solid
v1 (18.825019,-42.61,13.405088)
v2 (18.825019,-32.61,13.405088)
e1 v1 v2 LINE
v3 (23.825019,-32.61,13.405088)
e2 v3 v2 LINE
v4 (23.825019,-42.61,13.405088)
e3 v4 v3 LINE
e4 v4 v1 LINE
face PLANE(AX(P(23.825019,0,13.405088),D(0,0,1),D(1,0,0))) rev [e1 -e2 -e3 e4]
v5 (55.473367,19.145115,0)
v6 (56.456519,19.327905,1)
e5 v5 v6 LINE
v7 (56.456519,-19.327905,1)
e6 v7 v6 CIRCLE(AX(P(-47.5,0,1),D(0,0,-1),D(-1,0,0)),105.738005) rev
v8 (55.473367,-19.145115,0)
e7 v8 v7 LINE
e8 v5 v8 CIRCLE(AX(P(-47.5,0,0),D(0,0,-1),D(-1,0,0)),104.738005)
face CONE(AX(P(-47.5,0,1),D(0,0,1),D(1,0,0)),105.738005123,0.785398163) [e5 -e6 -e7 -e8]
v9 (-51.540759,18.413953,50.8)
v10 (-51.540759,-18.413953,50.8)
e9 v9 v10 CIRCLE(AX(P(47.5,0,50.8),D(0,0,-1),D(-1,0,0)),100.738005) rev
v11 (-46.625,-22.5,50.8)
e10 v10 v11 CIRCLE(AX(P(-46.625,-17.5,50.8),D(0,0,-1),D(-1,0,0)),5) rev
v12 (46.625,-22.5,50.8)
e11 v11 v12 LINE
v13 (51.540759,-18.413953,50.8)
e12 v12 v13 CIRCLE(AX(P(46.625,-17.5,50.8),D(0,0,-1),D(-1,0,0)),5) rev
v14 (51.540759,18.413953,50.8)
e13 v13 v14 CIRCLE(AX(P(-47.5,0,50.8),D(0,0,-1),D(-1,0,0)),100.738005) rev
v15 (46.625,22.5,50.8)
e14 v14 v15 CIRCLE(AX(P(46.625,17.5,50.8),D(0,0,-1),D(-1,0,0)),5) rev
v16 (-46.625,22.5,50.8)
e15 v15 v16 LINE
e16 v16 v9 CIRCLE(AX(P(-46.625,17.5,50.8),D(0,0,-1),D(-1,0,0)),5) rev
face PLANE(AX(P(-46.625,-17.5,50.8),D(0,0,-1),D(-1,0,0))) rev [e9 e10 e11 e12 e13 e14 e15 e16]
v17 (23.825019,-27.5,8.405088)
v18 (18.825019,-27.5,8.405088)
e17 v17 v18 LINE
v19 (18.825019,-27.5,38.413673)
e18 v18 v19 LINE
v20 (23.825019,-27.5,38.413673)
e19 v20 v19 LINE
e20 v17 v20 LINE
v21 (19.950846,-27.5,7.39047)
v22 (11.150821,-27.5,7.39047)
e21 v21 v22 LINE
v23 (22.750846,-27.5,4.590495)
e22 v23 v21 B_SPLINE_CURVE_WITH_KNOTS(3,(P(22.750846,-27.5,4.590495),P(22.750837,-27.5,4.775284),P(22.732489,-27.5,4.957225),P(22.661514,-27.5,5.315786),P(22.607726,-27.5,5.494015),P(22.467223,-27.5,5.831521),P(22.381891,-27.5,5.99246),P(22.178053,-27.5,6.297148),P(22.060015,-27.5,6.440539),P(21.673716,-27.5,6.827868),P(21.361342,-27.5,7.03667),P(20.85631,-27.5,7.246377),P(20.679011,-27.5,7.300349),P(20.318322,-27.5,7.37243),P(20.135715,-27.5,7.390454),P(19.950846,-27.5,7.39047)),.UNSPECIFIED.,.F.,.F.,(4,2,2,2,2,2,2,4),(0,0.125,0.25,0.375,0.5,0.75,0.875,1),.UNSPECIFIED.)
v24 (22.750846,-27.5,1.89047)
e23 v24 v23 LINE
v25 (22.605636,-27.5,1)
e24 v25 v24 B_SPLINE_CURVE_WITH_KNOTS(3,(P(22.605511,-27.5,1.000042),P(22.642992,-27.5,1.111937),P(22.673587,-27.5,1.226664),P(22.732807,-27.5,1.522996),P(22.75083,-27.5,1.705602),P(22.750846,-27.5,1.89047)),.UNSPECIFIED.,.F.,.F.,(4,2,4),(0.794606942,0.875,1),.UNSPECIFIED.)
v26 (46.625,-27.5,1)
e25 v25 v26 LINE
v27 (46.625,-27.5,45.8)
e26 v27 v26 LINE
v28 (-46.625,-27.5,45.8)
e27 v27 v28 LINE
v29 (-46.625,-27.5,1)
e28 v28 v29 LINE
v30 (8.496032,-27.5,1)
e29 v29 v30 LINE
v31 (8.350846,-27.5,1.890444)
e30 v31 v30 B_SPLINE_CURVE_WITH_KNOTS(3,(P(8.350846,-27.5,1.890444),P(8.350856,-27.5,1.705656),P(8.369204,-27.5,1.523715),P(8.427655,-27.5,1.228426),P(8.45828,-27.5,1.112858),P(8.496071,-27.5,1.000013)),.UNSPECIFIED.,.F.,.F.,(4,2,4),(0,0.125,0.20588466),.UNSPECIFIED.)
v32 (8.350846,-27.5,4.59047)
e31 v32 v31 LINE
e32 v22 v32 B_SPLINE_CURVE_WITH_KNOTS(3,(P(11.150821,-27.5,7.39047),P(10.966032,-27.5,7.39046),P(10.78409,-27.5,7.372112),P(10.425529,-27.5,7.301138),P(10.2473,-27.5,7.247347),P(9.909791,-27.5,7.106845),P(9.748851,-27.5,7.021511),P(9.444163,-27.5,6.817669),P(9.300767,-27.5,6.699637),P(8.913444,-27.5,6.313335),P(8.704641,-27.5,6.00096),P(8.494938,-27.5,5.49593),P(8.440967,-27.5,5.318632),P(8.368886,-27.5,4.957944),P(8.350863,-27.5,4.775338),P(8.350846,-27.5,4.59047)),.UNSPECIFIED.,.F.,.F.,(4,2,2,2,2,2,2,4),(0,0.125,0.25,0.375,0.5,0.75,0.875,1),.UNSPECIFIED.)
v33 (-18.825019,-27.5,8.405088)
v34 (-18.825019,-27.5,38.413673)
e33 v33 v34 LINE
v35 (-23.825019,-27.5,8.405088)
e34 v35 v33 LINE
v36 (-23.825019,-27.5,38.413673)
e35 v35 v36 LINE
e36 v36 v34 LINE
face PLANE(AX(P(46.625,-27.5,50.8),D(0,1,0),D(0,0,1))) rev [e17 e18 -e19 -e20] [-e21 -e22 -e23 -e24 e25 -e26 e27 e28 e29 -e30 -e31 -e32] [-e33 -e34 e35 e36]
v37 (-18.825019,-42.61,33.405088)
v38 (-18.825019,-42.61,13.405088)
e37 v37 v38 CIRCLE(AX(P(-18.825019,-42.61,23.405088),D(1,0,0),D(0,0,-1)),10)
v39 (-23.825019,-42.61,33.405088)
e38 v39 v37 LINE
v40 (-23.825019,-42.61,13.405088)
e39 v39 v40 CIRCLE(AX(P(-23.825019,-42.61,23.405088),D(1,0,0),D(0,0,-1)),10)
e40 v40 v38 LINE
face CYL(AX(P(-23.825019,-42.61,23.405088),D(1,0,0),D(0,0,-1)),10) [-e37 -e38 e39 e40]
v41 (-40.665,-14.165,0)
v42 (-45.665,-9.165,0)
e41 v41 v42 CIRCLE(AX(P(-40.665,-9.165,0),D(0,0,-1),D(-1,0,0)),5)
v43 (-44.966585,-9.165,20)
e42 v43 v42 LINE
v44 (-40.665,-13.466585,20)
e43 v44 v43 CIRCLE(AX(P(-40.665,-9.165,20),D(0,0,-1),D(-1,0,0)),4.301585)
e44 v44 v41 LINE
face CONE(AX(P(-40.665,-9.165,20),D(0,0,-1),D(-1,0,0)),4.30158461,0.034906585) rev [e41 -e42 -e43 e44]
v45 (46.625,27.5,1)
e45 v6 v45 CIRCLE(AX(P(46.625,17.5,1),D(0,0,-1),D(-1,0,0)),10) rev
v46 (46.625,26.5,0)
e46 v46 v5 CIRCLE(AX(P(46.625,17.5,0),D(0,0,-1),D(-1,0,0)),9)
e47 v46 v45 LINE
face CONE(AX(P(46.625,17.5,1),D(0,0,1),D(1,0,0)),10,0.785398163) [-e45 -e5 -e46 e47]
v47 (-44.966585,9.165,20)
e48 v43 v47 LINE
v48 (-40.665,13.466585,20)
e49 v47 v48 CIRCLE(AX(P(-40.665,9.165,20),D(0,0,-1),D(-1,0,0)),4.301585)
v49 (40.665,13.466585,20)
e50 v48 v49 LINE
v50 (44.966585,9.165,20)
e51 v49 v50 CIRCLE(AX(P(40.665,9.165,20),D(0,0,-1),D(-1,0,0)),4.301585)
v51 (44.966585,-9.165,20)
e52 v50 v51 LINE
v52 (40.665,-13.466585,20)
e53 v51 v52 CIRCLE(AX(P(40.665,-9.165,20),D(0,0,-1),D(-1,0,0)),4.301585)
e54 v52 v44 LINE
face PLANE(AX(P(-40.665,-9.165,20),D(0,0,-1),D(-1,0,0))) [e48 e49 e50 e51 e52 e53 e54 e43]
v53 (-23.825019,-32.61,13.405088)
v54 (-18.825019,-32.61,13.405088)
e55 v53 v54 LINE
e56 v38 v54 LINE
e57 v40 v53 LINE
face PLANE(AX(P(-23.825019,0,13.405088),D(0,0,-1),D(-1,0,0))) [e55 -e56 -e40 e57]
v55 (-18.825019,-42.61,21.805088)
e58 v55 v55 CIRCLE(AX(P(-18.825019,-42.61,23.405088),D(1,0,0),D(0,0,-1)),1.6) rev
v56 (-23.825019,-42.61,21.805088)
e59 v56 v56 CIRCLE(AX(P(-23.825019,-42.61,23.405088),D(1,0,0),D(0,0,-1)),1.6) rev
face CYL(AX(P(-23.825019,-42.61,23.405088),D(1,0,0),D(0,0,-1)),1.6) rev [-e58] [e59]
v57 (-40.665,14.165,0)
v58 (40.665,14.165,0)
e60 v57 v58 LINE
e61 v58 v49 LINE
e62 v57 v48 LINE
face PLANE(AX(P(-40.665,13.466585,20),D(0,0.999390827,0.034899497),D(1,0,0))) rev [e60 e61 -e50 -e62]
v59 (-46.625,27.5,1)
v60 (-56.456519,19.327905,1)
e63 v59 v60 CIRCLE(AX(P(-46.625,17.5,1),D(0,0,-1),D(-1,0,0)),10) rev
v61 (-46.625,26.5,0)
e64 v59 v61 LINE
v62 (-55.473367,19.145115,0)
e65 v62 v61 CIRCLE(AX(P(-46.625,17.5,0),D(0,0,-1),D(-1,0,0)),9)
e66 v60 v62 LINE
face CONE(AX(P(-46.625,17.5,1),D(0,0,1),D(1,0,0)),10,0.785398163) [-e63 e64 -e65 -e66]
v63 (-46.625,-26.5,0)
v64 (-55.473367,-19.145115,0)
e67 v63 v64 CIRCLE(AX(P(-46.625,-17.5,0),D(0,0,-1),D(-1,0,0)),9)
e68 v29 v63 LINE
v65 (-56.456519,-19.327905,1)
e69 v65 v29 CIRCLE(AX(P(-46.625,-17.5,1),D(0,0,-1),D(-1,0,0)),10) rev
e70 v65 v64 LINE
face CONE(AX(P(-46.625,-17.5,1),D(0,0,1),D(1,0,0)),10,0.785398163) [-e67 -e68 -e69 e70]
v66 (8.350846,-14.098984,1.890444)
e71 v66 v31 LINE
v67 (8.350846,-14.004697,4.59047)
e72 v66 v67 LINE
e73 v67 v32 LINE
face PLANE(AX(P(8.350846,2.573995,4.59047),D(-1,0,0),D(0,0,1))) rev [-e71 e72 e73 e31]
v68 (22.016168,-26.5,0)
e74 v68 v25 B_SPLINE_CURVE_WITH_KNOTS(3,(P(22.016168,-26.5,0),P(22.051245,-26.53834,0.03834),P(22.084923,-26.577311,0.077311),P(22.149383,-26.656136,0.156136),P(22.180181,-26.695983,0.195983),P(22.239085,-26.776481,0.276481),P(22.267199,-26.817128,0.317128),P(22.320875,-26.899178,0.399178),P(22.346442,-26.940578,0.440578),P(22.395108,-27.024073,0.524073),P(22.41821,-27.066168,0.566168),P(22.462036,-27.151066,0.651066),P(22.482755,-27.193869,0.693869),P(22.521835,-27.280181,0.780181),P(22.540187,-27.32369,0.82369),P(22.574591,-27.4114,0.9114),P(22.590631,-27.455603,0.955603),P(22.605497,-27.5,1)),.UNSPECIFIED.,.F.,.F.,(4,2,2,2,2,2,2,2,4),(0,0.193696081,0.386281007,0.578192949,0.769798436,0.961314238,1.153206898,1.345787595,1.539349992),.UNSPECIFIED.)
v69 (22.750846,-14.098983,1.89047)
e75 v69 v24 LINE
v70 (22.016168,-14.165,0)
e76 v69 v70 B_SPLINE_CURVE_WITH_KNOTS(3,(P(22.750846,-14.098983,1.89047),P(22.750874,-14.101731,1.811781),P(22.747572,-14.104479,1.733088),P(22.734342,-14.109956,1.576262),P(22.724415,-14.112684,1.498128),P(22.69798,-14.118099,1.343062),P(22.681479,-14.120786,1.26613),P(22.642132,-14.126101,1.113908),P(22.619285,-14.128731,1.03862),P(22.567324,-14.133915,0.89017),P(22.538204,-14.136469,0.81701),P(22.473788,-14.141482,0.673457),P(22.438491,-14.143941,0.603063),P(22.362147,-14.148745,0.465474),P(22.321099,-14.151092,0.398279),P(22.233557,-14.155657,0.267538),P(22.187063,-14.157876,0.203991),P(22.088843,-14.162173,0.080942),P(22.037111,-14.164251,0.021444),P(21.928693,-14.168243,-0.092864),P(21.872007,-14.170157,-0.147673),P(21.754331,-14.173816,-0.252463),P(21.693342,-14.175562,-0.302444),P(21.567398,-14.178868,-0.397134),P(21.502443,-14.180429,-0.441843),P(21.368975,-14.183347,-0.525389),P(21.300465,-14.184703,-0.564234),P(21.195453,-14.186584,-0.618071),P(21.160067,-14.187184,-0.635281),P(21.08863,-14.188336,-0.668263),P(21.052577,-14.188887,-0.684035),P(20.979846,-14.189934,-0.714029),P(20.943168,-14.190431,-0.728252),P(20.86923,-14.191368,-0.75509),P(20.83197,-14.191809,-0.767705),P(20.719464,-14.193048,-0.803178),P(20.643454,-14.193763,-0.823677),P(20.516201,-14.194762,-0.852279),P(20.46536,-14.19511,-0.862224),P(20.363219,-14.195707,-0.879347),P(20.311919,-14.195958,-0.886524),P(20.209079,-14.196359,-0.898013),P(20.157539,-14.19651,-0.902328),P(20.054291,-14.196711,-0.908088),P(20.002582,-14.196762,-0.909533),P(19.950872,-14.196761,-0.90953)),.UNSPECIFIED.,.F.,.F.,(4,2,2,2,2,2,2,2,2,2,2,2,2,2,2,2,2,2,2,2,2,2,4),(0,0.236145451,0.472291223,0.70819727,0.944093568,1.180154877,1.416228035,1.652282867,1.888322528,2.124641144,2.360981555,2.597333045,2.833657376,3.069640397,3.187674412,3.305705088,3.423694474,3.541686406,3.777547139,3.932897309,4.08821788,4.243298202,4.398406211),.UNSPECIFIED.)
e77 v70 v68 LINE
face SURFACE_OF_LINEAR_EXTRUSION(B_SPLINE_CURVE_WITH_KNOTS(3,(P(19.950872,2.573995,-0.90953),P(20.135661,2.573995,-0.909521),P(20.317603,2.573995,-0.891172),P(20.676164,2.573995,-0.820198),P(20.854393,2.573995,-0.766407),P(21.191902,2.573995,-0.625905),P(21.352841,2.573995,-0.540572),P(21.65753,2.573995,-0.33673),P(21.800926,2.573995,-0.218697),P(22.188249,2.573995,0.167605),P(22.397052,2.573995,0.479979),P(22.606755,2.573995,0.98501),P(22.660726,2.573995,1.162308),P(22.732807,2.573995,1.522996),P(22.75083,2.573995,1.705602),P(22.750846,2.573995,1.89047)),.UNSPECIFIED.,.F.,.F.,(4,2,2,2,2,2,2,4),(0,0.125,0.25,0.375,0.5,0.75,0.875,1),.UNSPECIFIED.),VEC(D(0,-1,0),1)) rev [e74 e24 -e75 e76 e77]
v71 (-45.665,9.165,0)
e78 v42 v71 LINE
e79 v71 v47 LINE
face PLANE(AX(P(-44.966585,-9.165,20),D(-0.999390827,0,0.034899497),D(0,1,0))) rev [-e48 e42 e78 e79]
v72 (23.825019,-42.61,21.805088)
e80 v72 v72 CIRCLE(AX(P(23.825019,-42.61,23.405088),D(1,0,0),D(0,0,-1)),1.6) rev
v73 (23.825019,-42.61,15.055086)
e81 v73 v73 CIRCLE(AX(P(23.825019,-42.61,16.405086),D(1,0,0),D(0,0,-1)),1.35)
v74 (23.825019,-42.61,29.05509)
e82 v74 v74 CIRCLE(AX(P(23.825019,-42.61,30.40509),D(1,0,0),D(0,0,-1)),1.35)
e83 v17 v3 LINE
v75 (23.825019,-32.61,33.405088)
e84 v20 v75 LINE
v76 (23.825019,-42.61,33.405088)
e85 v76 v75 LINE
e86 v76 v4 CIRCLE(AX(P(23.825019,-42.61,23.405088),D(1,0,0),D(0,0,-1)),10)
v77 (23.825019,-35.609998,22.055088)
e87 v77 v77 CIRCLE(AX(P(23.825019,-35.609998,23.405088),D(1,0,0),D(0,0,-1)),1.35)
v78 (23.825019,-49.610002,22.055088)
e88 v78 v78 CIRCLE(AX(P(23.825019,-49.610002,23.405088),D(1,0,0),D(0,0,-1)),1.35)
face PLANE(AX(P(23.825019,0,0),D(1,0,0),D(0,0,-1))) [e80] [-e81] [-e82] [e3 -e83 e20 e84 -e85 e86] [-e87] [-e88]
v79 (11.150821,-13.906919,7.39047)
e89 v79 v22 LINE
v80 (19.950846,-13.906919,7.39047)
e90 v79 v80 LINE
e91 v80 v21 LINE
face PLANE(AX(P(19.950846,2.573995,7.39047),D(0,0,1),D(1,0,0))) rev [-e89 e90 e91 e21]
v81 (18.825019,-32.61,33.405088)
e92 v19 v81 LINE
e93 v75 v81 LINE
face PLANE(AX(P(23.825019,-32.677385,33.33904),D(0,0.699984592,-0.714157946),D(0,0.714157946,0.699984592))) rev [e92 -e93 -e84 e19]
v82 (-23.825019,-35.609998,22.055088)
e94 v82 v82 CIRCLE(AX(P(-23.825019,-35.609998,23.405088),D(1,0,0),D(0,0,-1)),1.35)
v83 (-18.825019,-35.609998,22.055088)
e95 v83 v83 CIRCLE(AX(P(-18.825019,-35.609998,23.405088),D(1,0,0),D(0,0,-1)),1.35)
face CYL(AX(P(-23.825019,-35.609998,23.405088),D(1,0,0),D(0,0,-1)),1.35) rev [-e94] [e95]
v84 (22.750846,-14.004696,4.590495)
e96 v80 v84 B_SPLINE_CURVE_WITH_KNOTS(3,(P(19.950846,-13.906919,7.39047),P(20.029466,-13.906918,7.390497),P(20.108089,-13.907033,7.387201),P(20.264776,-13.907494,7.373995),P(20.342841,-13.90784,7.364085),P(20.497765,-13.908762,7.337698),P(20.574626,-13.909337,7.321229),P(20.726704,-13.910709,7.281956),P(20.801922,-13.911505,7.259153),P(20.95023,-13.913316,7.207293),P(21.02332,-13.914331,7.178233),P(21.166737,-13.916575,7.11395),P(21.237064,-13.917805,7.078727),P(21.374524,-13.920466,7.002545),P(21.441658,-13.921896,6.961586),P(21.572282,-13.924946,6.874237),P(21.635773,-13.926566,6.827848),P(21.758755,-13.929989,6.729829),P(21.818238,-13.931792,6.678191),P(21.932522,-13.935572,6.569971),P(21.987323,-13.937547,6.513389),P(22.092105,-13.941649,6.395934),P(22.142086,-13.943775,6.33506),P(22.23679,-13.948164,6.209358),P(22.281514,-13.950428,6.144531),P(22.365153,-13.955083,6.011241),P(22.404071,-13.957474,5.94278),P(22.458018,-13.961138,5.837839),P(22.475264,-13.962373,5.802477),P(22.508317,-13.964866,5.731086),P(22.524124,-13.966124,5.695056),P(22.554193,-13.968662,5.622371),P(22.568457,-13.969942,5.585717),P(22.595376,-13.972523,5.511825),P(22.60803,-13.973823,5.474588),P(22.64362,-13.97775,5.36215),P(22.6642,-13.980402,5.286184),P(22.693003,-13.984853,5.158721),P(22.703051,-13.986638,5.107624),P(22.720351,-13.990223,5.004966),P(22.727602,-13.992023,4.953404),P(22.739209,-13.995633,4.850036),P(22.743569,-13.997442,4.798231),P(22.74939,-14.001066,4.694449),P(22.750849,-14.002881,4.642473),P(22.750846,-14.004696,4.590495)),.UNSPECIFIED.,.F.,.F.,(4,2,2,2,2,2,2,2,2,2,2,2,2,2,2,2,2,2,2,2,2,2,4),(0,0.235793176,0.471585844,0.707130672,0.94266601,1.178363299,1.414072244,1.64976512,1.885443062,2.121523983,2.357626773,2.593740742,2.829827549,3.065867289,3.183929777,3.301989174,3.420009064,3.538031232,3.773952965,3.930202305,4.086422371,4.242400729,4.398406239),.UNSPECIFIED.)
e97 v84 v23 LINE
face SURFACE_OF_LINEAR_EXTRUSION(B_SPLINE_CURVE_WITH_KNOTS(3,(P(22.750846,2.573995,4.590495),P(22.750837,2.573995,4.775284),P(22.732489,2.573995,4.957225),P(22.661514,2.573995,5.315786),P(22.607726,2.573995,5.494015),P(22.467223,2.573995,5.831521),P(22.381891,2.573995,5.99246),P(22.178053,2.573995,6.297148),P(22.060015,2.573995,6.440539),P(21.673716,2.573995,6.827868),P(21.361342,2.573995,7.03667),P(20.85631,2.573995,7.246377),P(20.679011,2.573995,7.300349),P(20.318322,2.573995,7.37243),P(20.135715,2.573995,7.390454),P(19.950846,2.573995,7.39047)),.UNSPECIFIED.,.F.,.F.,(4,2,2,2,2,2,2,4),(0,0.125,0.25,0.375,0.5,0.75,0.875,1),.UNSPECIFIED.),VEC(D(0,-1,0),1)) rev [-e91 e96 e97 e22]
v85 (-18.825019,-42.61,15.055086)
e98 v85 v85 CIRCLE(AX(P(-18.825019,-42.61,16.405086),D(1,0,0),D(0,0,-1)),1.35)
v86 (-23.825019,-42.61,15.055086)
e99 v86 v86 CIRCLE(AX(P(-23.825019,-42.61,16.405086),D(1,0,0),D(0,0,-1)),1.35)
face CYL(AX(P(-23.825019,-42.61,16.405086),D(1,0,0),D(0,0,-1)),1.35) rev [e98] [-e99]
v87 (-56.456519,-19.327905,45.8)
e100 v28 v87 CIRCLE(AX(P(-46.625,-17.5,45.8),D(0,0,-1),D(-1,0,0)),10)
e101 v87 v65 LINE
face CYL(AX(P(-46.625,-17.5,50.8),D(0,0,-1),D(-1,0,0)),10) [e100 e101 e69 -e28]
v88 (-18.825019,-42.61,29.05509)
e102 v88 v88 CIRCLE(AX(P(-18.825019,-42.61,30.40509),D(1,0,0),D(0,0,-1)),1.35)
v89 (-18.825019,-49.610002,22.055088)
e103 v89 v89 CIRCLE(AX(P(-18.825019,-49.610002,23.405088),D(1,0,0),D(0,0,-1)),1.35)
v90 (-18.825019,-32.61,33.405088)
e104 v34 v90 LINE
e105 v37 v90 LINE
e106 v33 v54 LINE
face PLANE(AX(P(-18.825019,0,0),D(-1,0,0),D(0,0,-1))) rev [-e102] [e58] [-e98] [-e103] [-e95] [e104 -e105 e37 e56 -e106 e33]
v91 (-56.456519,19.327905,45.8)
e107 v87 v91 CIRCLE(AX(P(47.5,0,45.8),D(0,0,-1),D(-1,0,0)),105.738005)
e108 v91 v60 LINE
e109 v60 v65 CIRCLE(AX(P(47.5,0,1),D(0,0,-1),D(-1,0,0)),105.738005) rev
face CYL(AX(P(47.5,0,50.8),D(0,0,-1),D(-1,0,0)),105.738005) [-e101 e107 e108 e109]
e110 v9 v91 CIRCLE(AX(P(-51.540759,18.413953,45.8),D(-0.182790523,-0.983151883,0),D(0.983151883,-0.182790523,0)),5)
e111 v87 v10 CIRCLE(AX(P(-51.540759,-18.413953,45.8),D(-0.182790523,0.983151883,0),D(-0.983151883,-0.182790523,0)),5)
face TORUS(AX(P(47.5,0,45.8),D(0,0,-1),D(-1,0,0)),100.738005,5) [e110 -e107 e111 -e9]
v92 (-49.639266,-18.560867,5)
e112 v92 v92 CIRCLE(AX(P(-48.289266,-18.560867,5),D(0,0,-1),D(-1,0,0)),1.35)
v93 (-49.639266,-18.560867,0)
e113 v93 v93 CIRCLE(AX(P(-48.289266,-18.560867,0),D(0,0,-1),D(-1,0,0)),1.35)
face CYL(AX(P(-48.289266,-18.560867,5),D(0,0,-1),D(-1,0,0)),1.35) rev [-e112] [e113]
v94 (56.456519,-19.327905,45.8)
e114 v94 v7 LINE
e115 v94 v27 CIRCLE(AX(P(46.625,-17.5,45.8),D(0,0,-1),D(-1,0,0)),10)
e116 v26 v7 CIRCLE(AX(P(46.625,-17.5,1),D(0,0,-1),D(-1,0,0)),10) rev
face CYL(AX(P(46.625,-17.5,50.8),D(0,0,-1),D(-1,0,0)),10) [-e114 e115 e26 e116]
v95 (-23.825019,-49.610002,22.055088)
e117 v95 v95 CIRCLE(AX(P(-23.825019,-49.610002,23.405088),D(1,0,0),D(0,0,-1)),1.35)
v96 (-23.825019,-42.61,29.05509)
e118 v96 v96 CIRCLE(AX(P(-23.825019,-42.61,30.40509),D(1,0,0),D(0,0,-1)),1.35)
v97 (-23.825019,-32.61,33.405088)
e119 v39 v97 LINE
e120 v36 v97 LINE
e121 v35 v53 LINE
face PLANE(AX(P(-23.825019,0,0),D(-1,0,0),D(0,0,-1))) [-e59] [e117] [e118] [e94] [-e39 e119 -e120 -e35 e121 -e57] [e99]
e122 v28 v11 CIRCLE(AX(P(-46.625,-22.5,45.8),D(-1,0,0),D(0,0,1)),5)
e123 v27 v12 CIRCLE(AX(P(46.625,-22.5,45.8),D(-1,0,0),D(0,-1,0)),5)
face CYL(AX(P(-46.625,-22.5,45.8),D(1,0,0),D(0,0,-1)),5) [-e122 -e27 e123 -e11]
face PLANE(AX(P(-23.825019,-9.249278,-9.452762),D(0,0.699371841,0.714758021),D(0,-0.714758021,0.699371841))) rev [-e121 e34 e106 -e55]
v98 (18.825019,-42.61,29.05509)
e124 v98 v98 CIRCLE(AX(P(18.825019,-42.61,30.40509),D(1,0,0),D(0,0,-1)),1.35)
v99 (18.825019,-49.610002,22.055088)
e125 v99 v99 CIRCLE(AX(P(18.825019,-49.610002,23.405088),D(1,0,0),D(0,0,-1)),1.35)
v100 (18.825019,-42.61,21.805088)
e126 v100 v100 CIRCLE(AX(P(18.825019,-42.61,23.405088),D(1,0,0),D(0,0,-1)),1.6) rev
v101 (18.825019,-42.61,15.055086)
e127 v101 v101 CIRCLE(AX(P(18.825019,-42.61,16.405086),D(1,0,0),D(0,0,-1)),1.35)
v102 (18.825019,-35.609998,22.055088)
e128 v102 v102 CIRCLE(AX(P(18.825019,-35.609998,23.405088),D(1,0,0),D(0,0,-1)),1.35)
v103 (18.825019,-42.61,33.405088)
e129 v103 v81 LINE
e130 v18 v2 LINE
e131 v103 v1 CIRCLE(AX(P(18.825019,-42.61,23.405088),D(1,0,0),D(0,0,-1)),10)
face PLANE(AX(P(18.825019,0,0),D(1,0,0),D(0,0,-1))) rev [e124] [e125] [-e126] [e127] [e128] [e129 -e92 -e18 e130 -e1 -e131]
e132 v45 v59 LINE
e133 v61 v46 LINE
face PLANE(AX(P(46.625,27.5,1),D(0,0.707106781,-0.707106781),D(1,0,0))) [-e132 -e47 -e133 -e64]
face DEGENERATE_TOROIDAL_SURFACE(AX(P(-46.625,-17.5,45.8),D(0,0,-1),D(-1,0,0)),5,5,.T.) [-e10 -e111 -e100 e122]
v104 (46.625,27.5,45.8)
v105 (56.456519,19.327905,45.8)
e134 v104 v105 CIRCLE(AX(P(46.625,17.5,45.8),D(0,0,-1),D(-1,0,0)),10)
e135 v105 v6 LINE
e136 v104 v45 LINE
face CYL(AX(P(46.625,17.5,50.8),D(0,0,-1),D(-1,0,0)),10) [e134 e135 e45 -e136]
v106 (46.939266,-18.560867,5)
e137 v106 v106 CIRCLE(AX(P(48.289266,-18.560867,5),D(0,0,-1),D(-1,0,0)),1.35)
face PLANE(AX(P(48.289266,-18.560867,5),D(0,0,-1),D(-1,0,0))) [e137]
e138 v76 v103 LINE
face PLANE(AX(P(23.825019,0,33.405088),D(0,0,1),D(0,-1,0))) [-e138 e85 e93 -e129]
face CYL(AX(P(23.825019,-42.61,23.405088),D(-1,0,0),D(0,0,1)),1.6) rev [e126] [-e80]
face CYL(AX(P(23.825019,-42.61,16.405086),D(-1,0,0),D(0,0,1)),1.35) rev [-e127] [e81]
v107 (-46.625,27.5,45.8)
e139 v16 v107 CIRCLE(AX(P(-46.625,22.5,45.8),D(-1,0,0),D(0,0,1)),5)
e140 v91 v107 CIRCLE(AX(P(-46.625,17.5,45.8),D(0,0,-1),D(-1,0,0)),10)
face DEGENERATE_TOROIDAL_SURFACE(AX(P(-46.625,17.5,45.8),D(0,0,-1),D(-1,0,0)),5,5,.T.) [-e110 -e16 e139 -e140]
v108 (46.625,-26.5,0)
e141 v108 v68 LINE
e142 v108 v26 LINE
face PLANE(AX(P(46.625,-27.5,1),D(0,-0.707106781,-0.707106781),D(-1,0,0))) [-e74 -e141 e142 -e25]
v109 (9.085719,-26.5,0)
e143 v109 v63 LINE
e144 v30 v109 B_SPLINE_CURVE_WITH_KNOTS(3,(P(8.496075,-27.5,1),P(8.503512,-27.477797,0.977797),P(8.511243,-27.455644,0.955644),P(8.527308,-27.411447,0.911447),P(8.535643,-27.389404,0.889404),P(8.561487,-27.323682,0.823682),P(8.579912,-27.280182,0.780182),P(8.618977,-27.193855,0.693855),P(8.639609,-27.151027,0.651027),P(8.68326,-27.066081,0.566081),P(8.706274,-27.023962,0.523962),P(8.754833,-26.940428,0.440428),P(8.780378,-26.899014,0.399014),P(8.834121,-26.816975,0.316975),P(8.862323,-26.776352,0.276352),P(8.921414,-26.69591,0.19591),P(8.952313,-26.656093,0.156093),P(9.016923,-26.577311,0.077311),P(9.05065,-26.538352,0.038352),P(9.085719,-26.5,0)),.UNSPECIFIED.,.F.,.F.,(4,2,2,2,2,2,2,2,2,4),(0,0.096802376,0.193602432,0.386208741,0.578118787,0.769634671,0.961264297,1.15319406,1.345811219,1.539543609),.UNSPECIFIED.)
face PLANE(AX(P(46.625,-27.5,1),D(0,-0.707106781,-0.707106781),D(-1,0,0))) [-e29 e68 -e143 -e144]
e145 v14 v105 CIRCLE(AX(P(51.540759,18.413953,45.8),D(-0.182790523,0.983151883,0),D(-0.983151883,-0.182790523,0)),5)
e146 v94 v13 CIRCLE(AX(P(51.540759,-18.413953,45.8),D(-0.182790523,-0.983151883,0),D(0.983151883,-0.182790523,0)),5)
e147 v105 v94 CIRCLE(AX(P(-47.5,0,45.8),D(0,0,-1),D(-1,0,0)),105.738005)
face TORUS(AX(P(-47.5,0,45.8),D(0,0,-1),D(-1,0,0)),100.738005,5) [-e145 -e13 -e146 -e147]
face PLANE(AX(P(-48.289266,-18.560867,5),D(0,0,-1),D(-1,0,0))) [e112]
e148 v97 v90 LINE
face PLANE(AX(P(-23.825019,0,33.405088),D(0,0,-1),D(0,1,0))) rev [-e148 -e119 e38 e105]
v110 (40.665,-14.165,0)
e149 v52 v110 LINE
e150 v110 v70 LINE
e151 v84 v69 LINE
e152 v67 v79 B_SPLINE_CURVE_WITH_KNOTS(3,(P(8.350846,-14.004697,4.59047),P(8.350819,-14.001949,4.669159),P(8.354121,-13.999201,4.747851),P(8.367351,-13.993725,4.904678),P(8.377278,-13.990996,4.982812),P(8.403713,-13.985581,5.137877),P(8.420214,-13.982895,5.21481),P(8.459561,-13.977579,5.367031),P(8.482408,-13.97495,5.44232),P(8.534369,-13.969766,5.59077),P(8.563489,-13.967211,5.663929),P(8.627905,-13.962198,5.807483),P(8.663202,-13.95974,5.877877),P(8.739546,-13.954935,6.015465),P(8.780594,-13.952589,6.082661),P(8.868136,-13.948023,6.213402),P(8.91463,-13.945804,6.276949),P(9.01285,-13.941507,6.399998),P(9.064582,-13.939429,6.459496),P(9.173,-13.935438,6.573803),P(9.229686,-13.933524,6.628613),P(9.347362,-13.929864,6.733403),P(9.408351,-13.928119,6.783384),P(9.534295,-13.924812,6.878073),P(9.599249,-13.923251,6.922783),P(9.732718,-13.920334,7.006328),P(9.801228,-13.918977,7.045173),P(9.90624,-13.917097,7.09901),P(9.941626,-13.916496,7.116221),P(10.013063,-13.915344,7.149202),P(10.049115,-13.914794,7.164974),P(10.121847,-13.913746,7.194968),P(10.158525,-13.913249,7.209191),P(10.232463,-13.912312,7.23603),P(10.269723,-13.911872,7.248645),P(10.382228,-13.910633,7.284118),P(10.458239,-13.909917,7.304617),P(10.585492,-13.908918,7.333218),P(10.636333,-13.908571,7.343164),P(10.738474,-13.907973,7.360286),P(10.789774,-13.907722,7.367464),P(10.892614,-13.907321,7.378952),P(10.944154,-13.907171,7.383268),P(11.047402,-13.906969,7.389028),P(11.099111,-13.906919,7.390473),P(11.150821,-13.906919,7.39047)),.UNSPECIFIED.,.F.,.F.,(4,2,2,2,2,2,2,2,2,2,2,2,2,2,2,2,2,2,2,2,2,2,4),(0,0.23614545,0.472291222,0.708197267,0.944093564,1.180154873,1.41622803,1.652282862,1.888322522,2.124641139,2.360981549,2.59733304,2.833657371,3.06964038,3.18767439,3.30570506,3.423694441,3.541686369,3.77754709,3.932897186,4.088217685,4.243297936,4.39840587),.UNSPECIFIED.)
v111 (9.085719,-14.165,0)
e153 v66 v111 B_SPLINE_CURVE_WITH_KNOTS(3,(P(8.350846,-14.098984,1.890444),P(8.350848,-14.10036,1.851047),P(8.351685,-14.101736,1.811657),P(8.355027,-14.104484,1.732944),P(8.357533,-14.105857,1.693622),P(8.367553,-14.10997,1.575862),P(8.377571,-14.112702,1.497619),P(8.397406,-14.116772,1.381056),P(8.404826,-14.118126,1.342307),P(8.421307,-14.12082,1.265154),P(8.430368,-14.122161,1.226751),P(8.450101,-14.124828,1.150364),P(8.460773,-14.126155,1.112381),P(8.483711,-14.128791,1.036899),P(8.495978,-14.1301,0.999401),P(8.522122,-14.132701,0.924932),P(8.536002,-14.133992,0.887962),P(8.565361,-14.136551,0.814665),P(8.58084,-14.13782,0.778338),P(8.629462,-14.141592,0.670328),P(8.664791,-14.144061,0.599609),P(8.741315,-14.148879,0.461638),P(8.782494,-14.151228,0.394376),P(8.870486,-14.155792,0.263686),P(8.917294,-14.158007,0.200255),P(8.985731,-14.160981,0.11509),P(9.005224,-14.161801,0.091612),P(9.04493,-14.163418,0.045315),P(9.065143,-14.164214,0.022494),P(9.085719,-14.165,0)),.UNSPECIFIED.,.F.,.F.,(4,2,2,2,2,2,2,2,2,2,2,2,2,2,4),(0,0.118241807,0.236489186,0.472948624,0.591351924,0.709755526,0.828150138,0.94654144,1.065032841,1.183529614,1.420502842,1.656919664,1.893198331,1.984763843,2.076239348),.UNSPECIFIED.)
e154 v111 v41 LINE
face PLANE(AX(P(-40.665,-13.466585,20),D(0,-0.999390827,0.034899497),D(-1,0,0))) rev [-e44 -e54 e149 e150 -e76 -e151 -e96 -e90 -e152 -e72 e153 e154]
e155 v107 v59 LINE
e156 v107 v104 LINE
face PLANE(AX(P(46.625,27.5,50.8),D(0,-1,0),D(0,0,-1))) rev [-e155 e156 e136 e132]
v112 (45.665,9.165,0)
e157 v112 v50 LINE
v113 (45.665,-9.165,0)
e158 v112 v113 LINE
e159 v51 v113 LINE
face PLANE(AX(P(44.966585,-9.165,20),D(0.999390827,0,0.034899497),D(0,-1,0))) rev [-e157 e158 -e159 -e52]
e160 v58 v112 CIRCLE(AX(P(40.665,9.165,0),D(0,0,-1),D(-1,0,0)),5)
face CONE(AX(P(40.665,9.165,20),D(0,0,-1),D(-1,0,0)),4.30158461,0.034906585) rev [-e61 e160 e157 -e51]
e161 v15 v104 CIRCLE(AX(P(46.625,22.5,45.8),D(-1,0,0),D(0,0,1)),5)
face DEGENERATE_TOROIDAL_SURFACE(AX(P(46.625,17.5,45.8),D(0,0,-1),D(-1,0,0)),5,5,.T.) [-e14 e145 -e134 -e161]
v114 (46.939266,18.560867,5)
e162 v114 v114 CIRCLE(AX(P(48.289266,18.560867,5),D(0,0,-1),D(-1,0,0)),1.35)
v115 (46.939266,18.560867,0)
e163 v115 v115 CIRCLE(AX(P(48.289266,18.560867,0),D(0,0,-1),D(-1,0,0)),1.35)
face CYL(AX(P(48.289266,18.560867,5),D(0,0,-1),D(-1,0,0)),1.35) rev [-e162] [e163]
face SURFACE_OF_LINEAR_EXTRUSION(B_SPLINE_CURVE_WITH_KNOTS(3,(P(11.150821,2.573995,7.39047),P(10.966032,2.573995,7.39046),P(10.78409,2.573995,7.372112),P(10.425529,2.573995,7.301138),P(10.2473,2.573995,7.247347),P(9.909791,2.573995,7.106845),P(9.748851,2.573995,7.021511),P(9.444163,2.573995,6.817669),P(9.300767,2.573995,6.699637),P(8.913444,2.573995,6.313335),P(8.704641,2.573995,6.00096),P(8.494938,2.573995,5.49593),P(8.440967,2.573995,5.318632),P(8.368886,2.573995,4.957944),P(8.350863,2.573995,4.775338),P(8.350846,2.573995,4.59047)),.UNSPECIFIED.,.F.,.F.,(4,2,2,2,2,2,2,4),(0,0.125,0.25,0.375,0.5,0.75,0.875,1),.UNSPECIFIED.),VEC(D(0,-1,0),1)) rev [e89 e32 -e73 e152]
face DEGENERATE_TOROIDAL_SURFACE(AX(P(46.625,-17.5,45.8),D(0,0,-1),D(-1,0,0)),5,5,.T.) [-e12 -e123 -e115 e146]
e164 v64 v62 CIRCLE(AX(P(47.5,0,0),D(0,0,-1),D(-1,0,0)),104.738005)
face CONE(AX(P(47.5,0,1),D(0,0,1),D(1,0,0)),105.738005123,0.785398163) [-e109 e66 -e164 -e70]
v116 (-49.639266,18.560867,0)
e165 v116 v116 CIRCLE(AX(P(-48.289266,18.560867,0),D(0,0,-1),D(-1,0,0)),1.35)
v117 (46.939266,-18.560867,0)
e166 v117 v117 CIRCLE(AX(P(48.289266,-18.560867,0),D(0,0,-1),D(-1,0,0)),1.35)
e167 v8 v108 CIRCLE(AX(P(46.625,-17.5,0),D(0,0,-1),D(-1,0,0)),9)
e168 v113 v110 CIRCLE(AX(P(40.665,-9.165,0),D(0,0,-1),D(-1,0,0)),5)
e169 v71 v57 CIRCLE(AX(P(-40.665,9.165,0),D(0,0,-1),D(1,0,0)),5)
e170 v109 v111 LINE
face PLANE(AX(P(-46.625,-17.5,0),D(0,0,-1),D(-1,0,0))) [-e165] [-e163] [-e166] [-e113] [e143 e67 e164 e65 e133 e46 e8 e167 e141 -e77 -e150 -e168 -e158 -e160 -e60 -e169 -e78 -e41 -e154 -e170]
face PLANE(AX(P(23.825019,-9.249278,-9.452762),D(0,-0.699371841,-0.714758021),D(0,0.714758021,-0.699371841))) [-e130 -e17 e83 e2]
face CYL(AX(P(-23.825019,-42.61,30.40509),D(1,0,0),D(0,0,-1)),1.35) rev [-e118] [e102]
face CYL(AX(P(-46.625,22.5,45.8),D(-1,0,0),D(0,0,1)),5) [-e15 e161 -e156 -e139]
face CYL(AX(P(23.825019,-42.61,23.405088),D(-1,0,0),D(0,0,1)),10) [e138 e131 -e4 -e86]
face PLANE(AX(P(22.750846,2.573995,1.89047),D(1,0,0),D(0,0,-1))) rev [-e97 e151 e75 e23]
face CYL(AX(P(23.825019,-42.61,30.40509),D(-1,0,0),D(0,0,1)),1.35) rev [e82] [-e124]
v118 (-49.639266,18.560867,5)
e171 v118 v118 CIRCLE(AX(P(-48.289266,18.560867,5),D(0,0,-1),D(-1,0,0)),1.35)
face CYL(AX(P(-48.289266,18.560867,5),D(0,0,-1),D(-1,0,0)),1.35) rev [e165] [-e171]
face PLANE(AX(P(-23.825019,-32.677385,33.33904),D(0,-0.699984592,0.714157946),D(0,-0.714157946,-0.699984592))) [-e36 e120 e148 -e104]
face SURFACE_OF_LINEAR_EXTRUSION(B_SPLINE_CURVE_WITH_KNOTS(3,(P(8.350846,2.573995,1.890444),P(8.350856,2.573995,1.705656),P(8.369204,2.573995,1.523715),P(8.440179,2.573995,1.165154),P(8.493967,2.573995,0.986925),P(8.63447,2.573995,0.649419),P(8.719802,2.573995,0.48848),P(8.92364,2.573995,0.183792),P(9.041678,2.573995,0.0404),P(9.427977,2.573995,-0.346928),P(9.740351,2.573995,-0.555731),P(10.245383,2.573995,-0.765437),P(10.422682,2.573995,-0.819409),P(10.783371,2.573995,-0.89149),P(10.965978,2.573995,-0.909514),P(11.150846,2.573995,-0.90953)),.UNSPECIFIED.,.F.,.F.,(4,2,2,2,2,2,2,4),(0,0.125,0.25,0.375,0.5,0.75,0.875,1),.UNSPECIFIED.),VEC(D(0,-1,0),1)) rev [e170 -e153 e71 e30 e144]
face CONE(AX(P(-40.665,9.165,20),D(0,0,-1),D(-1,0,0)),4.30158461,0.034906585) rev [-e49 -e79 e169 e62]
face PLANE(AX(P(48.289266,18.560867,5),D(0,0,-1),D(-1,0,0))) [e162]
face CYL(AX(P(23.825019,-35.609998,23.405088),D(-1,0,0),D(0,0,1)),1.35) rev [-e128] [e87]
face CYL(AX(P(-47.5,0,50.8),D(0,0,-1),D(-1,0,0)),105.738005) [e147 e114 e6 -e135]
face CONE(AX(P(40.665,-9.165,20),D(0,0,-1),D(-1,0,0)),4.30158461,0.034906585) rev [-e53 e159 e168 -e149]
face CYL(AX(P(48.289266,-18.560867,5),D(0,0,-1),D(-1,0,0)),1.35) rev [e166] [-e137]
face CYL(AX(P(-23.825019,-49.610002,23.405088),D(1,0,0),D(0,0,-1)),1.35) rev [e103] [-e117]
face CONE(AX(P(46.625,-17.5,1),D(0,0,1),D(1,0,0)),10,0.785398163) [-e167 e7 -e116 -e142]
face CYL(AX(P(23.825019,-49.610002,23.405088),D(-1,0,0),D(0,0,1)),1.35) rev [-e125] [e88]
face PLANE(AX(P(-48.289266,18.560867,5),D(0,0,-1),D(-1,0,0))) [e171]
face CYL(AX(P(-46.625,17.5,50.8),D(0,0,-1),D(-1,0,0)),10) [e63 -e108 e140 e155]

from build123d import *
from OCP.BRepFilletAPI import BRepFilletAPI_MakeChamfer

# Parameters (mm, degrees)
BOSS_EXTRUDE5_DEPTH = 50.8
FILLET9_R           = 5
CHAMFER1_SIZE       = 1
SKETCH8_R           = 1.35
BOSS_EXTRUDE6_DEPTH = 5
CUT_EXTRUDE3_DEPTH  = 20
CHAMFER2_SIZE       = 20
CHAMFER2_SIZE_2     = 0.69841539
SKETCH15_R          = 1.35
CUT_EXTRUDE4_DEPTH  = 5
CUT_EXTRUDE5_REACH  = 96.854


with BuildPart() as part:
    # Sketch2 → Boss-Extrude5 (new body)
    with BuildSketch(Plane.XY):
        with BuildLine():
            Line((46.625, 27.5), (-46.625, 27.5))
            ThreePointArc((-46.625, 27.5), (-53.017219792, 25.190222762), (-56.456518829, 19.327905227))
            ThreePointArc((-56.456518829, 19.327905227), (-58.238005123, 0), (-56.456518829, -19.327905227))
            ThreePointArc((-56.456518829, -19.327905227), (-53.017219792, -25.190222762), (-46.625, -27.5))
            Line((-46.625, -27.5), (46.625, -27.5))
            ThreePointArc((46.625, -27.5), (53.017219792, -25.190222762), (56.456518829, -19.327905227))
            ThreePointArc((56.456518829, -19.327905227), (58.238005123, 0), (56.456518829, 19.327905227))
            ThreePointArc((56.456518829, 19.327905227), (53.017219792, 25.190222762), (46.625, 27.5))
        make_face()
    extrude(amount=BOSS_EXTRUDE5_DEPTH)

    # Fillet9
    fillet9_edges = [part.edges().sort_by_distance(p)[0] for p in [
        (53.017219792, -25.190222762, 50.8),
        (58.238005123, 0, 50.8),
        (53.017219792, 25.190222762, 50.8),
        (0, 27.5, 50.8),
        (-53.017219792, 25.190222762, 50.8),
        (-58.238005123, 0, 50.8),
        (-53.017219792, -25.190222762, 50.8),
        (0, -27.5, 50.8),
    ]]
    fillet(fillet9_edges, radius=FILLET9_R)

    # Chamfer1
    chamfer1_edges = [part.edges().sort_by_distance(p)[0] for p in [
        (58.238005123, 0, 0),
        (53.017219792, -25.190222762, 0),
        (0, -27.5, 0),
        (-53.017219792, -25.190222762, 0),
        (-58.238005123, 0, 0),
        (-53.017219792, 25.190222762, 0),
        (0, 27.5, 0),
        (53.017219792, 25.190222762, 0),
    ]]
    chamfer(chamfer1_edges, length=CHAMFER1_SIZE)

    # Sketch8 → Boss-Extrude6 (add)
    # profile 1 of 2: a face of its own
    with BuildSketch(Plane(origin=(18.825019181, 0, 0), x_dir=(0, 0, -1), z_dir=(1, 0, 0))):
        with BuildLine():
            Line((-13.405087735, -32.61), (-8.405087735, -27.5))
            Line((-8.405087735, -27.5), (-13.405087735, -27.5))
            Line((-13.405087735, -27.5), (-33.413673421, -27.5))
            Line((-33.413673421, -27.5), (-38.413673421, -27.5))
            Line((-38.413673421, -27.5), (-33.405087735, -32.61))
            Line((-33.405087735, -32.61), (-33.405087735, -42.61))
            ThreePointArc((-33.405087735, -42.61), (-23.405087735, -52.61), (-13.405087735, -42.61))
            Line((-13.405087735, -42.61), (-13.405087735, -32.61))
        make_face()
        with BuildLine():
            ThreePointArc((-33.105086536, -42.61), (-23.405087735, -32.910001198), (-13.705088933, -42.61))
            ThreePointArc((-13.705088933, -42.61), (-23.405087735, -52.309998802), (-33.105086536, -42.61))
        make_face(mode=Mode.SUBTRACT)
    # profile 2 of 2: a face of its own
    with BuildSketch(Plane(origin=(18.825019181, 0, 0), x_dir=(0, 0, -1), z_dir=(1, 0, 0))):
        with BuildLine():
            ThreePointArc((-33.105086536, -42.61), (-23.405087735, -52.309998802), (-13.705088933, -42.61))
            ThreePointArc((-13.705088933, -42.61), (-23.405087735, -32.910001198), (-33.105086536, -42.61))
        make_face()
        with Locations((-30.405089608, -42.61)):
            Circle(SKETCH8_R, mode=Mode.SUBTRACT)
        with Locations((-23.405087735, -49.610001873)):
            Circle(SKETCH8_R, mode=Mode.SUBTRACT)
        with Locations((-16.405085862, -42.61)):
            Circle(SKETCH8_R, mode=Mode.SUBTRACT)
        with Locations((-23.405087735, -35.609998127)):
            Circle(SKETCH8_R, mode=Mode.SUBTRACT)
        with BuildLine():
            ThreePointArc((-21.805087735, -42.61), (-23.405087735, -44.21), (-25.005087735, -42.61))
            ThreePointArc((-25.005087735, -42.61), (-23.405087735, -41.01), (-21.805087735, -42.61))
        make_face(mode=Mode.SUBTRACT)
    boss_extrude6 = extrude(amount=BOSS_EXTRUDE6_DEPTH)

    # Mirror1: Boss-Extrude6 across plane
    add(boss_extrude6.mirror(Plane(origin=(0, 0, 0), x_dir=(0, 0, 1), z_dir=(1, 0, 0))))

    # Sketch4 → Cut-Extrude3 (cut)
    with BuildSketch(Plane(origin=(0, 0, 0), x_dir=(-1, 0, 0), z_dir=(0, 0, -1))):
        with BuildLine():
            Line((-40.665, 14.165), (40.665, 14.165))
            ThreePointArc((40.665, 14.165), (44.200533906, 12.700533906), (45.665, 9.165))
            Line((45.665, 9.165), (45.665, -9.165))
            ThreePointArc((45.665, -9.165), (44.200533906, -12.700533906), (40.665, -14.165))
            Line((40.665, -14.165), (-40.665, -14.165))
            ThreePointArc((-40.665, -14.165), (-44.200533906, -12.700533906), (-45.665, -9.165))
            Line((-45.665, -9.165), (-45.665, 9.165))
            ThreePointArc((-45.665, 9.165), (-44.200533906, 12.700533906), (-40.665, 14.165))
        make_face()
    extrude(amount=-CUT_EXTRUDE3_DEPTH, mode=Mode.SUBTRACT)

    # Chamfer2
    chamfer2_edges_1 = [part.edges().sort_by_distance(p)[0] for p in [
        (-45.665, 0, 20),
    ]]
    chamfer2_side_1 = [part.faces().sort_by_distance(p)[0] for p in [
        (-45.665, 0, 19.986031692),
    ]]
    chamfer2_edges_2 = [part.edges().sort_by_distance(p)[0] for p in [
        (-44.200533906, 12.700533906, 20),
    ]]
    chamfer2_side_2 = [part.faces().sort_by_distance(p)[0] for p in [
        (-44.200533906, 12.700533906, 19.986031692),
    ]]
    chamfer2_edges_3 = [part.edges().sort_by_distance(p)[0] for p in [
        (-44.200533906, -12.700533906, 20),
    ]]
    chamfer2_side_3 = [part.faces().sort_by_distance(p)[0] for p in [
        (-44.200533906, -12.700533906, 19.986031692),
    ]]
    chamfer2_edges_4 = [part.edges().sort_by_distance(p)[0] for p in [
        (0, 14.165, 20),
    ]]
    chamfer2_side_4 = [part.faces().sort_by_distance(p)[0] for p in [
        (0, 14.165, 19.986031692),
    ]]
    chamfer2_edges_5 = [part.edges().sort_by_distance(p)[0] for p in [
        (0, -14.165, 20),
    ]]
    chamfer2_side_5 = [part.faces().sort_by_distance(p)[0] for p in [
        (0, -14.165, 19.986031692),
    ]]
    chamfer2_edges_6 = [part.edges().sort_by_distance(p)[0] for p in [
        (44.200533906, 12.700533906, 20),
    ]]
    chamfer2_side_6 = [part.faces().sort_by_distance(p)[0] for p in [
        (44.200533906, 12.700533906, 19.986031692),
    ]]
    chamfer2_edges_7 = [part.edges().sort_by_distance(p)[0] for p in [
        (44.200533906, -12.700533906, 20),
    ]]
    chamfer2_side_7 = [part.faces().sort_by_distance(p)[0] for p in [
        (44.200533906, -12.700533906, 19.986031692),
    ]]
    chamfer2_edges_8 = [part.edges().sort_by_distance(p)[0] for p in [
        (45.665, 0, 20),
    ]]
    chamfer2_side_8 = [part.faces().sort_by_distance(p)[0] for p in [
        (45.665, 0, 19.986031692),
    ]]
    chamfer2 = BRepFilletAPI_MakeChamfer(part.part.solid().wrapped)
    for e in chamfer2_edges_1:
        chamfer2.Add(CHAMFER2_SIZE - 0.0001, CHAMFER2_SIZE_2 - 0.0001, e.wrapped, chamfer2_side_1[0].wrapped)
    for e in chamfer2_edges_2:
        chamfer2.Add(CHAMFER2_SIZE - 0.0001, CHAMFER2_SIZE_2 - 0.0001, e.wrapped, chamfer2_side_2[0].wrapped)
    for e in chamfer2_edges_3:
        chamfer2.Add(CHAMFER2_SIZE - 0.0001, CHAMFER2_SIZE_2 - 0.0001, e.wrapped, chamfer2_side_3[0].wrapped)
    for e in chamfer2_edges_4:
        chamfer2.Add(CHAMFER2_SIZE - 0.0001, CHAMFER2_SIZE_2 - 0.0001, e.wrapped, chamfer2_side_4[0].wrapped)
    for e in chamfer2_edges_5:
        chamfer2.Add(CHAMFER2_SIZE - 0.0001, CHAMFER2_SIZE_2 - 0.0001, e.wrapped, chamfer2_side_5[0].wrapped)
    for e in chamfer2_edges_6:
        chamfer2.Add(CHAMFER2_SIZE - 0.0001, CHAMFER2_SIZE_2 - 0.0001, e.wrapped, chamfer2_side_6[0].wrapped)
    for e in chamfer2_edges_7:
        chamfer2.Add(CHAMFER2_SIZE - 0.0001, CHAMFER2_SIZE_2 - 0.0001, e.wrapped, chamfer2_side_7[0].wrapped)
    for e in chamfer2_edges_8:
        chamfer2.Add(CHAMFER2_SIZE - 0.0001, CHAMFER2_SIZE_2 - 0.0001, e.wrapped, chamfer2_side_8[0].wrapped)
    add(Compound.cast(chamfer2.Shape()), mode=Mode.REPLACE)  # a hair under: the kernel refuses the full size

    # Sketch15 → Cut-Extrude4 (cut)
    with BuildSketch(Plane(origin=(0, 0, 0), x_dir=(-1, 0, 0), z_dir=(0, 0, -1))):
        with Locations((-48.289265859, 18.560867196)):
            Circle(SKETCH15_R)
        with Locations((48.289265859, -18.560867196)):
            Circle(SKETCH15_R)
        with Locations((48.289265859, 18.560867196)):
            Circle(SKETCH15_R)
        with Locations((-48.289265859, -18.560867196)):
            Circle(SKETCH15_R)
    extrude(amount=-CUT_EXTRUDE4_DEPTH, mode=Mode.SUBTRACT)

    # Cut-Extrude5: up to this plane
    cut_extrude5_end = Plane(origin=(-40.665, -13.46658461, 20), z_dir=(0, -0.9993908270190957, 0.03489949670250434))
    # Sketch16 → Cut-Extrude5 (cut, up to the surface)
    with BuildSketch(Plane.XZ.offset(27.5), mode=Mode.PRIVATE) as cut_extrude5_sk1:
        with BuildLine():
            Line((22.750846484, 1.890469849), (22.750846483, 4.590495435))
            add(Edge.make_bspline(
                [(22.750846483, 4.590495435), (22.750837027, 4.775283781), (22.73248867, 4.957224969), (22.66151422, 5.315785643), (22.607726053, 5.494014537), (22.467223433, 5.831520977), (22.381891407, 5.992459845), (22.178053429, 6.297147896), (22.060014741, 6.4405393), (21.673716049, 6.827867738), (21.361341723, 7.036670346), (20.856309918, 7.246376919), (20.679010973, 7.300348953), (20.318322032, 7.372429863), (20.135714984, 7.390453685), (19.950846484, 7.390469849)],
                knots=[0, 0, 0, 0, 0.125, 0.125, 0.25, 0.25, 0.375, 0.375, 0.5, 0.5, 0.75, 0.75, 0.875, 0.875, 1, 1, 1, 1], degree=3))
            Line((19.950846484, 7.390469849), (11.150820748, 7.390469848))
            add(Edge.make_bspline(
                [(11.150820748, 7.390469848), (10.966031816, 7.390460337), (10.784090112, 7.372112007), (10.425528549, 7.301137677), (10.247300018, 7.247346686), (9.909790791, 7.10684451), (9.748851442, 7.021511102), (9.444163129, 6.81766935), (9.300766879, 6.699636548), (8.913443766, 6.313334984), (8.70464106, 6.000960293), (8.49493761, 5.495929858), (8.440966665, 5.318631956), (8.368886124, 4.957943952), (8.350862583, 4.775337528), (8.350846484, 4.590469849)],
                knots=[0, 0, 0, 0, 0.125, 0.125, 0.25, 0.25, 0.375, 0.375, 0.5, 0.5, 0.75, 0.75, 0.875, 0.875, 1, 1, 1, 1], degree=3))
            Line((8.350846484, 4.590469849), (8.350846484, 1.890444263))
            add(Edge.make_bspline(
                [(8.350846484, 1.890444263), (8.35085594, 1.705655915), (8.369204297, 1.523714726), (8.440178749, 1.16515405), (8.493966917, 0.986925155), (8.634469538, 0.649418711), (8.719801566, 0.488479842), (8.923639547, 0.18379179), (9.041678239, 0.040400386), (9.427976936, -0.346928055), (9.740351265, -0.555730668), (10.245383089, -0.765437205), (10.422682029, -0.819409245), (10.783370941, -0.89149025), (10.965977971, -0.909514153), (11.150846484, -0.909530151)],
                knots=[0, 0, 0, 0, 0.125, 0.125, 0.25, 0.25, 0.375, 0.375, 0.5, 0.5, 0.75, 0.75, 0.875, 0.875, 1, 1, 1, 1], degree=3))
            Line((11.150846484, -0.909530151), (19.950871885, -0.90953015))
            add(Edge.make_bspline(
                [(19.950871885, -0.90953015), (20.135660846, -0.909520763), (20.317602552, -0.891172404), (20.676164116, -0.820198035), (20.854392662, -0.766407072), (21.191901959, -0.625904928), (21.352841334, -0.540571521), (21.657529692, -0.336729764), (21.800925955, -0.218696966), (22.18824912, 0.167604602), (22.397051856, 0.479979307), (22.606755334, 0.985009778), (22.66072629, 1.1623077), (22.732806844, 1.522995721), (22.750830385, 1.705602156), (22.750846484, 1.890469849)],
                knots=[0, 0, 0, 0, 0.125, 0.125, 0.25, 0.25, 0.375, 0.375, 0.5, 0.5, 0.75, 0.75, 0.875, 0.875, 1, 1, 1, 1], degree=3))
        make_face()
    cut_extrude5_tool1 = split(extrude(cut_extrude5_sk1.sketch, amount=-CUT_EXTRUDE5_REACH, mode=Mode.PRIVATE), bisect_by=cut_extrude5_end, keep=Keep.BOTH, mode=Mode.PRIVATE)
    add(cut_extrude5_tool1.solids().sort_by_distance((15.550846, -27.5, 3.240452))[0], mode=Mode.SUBTRACT)


solid = part.part
